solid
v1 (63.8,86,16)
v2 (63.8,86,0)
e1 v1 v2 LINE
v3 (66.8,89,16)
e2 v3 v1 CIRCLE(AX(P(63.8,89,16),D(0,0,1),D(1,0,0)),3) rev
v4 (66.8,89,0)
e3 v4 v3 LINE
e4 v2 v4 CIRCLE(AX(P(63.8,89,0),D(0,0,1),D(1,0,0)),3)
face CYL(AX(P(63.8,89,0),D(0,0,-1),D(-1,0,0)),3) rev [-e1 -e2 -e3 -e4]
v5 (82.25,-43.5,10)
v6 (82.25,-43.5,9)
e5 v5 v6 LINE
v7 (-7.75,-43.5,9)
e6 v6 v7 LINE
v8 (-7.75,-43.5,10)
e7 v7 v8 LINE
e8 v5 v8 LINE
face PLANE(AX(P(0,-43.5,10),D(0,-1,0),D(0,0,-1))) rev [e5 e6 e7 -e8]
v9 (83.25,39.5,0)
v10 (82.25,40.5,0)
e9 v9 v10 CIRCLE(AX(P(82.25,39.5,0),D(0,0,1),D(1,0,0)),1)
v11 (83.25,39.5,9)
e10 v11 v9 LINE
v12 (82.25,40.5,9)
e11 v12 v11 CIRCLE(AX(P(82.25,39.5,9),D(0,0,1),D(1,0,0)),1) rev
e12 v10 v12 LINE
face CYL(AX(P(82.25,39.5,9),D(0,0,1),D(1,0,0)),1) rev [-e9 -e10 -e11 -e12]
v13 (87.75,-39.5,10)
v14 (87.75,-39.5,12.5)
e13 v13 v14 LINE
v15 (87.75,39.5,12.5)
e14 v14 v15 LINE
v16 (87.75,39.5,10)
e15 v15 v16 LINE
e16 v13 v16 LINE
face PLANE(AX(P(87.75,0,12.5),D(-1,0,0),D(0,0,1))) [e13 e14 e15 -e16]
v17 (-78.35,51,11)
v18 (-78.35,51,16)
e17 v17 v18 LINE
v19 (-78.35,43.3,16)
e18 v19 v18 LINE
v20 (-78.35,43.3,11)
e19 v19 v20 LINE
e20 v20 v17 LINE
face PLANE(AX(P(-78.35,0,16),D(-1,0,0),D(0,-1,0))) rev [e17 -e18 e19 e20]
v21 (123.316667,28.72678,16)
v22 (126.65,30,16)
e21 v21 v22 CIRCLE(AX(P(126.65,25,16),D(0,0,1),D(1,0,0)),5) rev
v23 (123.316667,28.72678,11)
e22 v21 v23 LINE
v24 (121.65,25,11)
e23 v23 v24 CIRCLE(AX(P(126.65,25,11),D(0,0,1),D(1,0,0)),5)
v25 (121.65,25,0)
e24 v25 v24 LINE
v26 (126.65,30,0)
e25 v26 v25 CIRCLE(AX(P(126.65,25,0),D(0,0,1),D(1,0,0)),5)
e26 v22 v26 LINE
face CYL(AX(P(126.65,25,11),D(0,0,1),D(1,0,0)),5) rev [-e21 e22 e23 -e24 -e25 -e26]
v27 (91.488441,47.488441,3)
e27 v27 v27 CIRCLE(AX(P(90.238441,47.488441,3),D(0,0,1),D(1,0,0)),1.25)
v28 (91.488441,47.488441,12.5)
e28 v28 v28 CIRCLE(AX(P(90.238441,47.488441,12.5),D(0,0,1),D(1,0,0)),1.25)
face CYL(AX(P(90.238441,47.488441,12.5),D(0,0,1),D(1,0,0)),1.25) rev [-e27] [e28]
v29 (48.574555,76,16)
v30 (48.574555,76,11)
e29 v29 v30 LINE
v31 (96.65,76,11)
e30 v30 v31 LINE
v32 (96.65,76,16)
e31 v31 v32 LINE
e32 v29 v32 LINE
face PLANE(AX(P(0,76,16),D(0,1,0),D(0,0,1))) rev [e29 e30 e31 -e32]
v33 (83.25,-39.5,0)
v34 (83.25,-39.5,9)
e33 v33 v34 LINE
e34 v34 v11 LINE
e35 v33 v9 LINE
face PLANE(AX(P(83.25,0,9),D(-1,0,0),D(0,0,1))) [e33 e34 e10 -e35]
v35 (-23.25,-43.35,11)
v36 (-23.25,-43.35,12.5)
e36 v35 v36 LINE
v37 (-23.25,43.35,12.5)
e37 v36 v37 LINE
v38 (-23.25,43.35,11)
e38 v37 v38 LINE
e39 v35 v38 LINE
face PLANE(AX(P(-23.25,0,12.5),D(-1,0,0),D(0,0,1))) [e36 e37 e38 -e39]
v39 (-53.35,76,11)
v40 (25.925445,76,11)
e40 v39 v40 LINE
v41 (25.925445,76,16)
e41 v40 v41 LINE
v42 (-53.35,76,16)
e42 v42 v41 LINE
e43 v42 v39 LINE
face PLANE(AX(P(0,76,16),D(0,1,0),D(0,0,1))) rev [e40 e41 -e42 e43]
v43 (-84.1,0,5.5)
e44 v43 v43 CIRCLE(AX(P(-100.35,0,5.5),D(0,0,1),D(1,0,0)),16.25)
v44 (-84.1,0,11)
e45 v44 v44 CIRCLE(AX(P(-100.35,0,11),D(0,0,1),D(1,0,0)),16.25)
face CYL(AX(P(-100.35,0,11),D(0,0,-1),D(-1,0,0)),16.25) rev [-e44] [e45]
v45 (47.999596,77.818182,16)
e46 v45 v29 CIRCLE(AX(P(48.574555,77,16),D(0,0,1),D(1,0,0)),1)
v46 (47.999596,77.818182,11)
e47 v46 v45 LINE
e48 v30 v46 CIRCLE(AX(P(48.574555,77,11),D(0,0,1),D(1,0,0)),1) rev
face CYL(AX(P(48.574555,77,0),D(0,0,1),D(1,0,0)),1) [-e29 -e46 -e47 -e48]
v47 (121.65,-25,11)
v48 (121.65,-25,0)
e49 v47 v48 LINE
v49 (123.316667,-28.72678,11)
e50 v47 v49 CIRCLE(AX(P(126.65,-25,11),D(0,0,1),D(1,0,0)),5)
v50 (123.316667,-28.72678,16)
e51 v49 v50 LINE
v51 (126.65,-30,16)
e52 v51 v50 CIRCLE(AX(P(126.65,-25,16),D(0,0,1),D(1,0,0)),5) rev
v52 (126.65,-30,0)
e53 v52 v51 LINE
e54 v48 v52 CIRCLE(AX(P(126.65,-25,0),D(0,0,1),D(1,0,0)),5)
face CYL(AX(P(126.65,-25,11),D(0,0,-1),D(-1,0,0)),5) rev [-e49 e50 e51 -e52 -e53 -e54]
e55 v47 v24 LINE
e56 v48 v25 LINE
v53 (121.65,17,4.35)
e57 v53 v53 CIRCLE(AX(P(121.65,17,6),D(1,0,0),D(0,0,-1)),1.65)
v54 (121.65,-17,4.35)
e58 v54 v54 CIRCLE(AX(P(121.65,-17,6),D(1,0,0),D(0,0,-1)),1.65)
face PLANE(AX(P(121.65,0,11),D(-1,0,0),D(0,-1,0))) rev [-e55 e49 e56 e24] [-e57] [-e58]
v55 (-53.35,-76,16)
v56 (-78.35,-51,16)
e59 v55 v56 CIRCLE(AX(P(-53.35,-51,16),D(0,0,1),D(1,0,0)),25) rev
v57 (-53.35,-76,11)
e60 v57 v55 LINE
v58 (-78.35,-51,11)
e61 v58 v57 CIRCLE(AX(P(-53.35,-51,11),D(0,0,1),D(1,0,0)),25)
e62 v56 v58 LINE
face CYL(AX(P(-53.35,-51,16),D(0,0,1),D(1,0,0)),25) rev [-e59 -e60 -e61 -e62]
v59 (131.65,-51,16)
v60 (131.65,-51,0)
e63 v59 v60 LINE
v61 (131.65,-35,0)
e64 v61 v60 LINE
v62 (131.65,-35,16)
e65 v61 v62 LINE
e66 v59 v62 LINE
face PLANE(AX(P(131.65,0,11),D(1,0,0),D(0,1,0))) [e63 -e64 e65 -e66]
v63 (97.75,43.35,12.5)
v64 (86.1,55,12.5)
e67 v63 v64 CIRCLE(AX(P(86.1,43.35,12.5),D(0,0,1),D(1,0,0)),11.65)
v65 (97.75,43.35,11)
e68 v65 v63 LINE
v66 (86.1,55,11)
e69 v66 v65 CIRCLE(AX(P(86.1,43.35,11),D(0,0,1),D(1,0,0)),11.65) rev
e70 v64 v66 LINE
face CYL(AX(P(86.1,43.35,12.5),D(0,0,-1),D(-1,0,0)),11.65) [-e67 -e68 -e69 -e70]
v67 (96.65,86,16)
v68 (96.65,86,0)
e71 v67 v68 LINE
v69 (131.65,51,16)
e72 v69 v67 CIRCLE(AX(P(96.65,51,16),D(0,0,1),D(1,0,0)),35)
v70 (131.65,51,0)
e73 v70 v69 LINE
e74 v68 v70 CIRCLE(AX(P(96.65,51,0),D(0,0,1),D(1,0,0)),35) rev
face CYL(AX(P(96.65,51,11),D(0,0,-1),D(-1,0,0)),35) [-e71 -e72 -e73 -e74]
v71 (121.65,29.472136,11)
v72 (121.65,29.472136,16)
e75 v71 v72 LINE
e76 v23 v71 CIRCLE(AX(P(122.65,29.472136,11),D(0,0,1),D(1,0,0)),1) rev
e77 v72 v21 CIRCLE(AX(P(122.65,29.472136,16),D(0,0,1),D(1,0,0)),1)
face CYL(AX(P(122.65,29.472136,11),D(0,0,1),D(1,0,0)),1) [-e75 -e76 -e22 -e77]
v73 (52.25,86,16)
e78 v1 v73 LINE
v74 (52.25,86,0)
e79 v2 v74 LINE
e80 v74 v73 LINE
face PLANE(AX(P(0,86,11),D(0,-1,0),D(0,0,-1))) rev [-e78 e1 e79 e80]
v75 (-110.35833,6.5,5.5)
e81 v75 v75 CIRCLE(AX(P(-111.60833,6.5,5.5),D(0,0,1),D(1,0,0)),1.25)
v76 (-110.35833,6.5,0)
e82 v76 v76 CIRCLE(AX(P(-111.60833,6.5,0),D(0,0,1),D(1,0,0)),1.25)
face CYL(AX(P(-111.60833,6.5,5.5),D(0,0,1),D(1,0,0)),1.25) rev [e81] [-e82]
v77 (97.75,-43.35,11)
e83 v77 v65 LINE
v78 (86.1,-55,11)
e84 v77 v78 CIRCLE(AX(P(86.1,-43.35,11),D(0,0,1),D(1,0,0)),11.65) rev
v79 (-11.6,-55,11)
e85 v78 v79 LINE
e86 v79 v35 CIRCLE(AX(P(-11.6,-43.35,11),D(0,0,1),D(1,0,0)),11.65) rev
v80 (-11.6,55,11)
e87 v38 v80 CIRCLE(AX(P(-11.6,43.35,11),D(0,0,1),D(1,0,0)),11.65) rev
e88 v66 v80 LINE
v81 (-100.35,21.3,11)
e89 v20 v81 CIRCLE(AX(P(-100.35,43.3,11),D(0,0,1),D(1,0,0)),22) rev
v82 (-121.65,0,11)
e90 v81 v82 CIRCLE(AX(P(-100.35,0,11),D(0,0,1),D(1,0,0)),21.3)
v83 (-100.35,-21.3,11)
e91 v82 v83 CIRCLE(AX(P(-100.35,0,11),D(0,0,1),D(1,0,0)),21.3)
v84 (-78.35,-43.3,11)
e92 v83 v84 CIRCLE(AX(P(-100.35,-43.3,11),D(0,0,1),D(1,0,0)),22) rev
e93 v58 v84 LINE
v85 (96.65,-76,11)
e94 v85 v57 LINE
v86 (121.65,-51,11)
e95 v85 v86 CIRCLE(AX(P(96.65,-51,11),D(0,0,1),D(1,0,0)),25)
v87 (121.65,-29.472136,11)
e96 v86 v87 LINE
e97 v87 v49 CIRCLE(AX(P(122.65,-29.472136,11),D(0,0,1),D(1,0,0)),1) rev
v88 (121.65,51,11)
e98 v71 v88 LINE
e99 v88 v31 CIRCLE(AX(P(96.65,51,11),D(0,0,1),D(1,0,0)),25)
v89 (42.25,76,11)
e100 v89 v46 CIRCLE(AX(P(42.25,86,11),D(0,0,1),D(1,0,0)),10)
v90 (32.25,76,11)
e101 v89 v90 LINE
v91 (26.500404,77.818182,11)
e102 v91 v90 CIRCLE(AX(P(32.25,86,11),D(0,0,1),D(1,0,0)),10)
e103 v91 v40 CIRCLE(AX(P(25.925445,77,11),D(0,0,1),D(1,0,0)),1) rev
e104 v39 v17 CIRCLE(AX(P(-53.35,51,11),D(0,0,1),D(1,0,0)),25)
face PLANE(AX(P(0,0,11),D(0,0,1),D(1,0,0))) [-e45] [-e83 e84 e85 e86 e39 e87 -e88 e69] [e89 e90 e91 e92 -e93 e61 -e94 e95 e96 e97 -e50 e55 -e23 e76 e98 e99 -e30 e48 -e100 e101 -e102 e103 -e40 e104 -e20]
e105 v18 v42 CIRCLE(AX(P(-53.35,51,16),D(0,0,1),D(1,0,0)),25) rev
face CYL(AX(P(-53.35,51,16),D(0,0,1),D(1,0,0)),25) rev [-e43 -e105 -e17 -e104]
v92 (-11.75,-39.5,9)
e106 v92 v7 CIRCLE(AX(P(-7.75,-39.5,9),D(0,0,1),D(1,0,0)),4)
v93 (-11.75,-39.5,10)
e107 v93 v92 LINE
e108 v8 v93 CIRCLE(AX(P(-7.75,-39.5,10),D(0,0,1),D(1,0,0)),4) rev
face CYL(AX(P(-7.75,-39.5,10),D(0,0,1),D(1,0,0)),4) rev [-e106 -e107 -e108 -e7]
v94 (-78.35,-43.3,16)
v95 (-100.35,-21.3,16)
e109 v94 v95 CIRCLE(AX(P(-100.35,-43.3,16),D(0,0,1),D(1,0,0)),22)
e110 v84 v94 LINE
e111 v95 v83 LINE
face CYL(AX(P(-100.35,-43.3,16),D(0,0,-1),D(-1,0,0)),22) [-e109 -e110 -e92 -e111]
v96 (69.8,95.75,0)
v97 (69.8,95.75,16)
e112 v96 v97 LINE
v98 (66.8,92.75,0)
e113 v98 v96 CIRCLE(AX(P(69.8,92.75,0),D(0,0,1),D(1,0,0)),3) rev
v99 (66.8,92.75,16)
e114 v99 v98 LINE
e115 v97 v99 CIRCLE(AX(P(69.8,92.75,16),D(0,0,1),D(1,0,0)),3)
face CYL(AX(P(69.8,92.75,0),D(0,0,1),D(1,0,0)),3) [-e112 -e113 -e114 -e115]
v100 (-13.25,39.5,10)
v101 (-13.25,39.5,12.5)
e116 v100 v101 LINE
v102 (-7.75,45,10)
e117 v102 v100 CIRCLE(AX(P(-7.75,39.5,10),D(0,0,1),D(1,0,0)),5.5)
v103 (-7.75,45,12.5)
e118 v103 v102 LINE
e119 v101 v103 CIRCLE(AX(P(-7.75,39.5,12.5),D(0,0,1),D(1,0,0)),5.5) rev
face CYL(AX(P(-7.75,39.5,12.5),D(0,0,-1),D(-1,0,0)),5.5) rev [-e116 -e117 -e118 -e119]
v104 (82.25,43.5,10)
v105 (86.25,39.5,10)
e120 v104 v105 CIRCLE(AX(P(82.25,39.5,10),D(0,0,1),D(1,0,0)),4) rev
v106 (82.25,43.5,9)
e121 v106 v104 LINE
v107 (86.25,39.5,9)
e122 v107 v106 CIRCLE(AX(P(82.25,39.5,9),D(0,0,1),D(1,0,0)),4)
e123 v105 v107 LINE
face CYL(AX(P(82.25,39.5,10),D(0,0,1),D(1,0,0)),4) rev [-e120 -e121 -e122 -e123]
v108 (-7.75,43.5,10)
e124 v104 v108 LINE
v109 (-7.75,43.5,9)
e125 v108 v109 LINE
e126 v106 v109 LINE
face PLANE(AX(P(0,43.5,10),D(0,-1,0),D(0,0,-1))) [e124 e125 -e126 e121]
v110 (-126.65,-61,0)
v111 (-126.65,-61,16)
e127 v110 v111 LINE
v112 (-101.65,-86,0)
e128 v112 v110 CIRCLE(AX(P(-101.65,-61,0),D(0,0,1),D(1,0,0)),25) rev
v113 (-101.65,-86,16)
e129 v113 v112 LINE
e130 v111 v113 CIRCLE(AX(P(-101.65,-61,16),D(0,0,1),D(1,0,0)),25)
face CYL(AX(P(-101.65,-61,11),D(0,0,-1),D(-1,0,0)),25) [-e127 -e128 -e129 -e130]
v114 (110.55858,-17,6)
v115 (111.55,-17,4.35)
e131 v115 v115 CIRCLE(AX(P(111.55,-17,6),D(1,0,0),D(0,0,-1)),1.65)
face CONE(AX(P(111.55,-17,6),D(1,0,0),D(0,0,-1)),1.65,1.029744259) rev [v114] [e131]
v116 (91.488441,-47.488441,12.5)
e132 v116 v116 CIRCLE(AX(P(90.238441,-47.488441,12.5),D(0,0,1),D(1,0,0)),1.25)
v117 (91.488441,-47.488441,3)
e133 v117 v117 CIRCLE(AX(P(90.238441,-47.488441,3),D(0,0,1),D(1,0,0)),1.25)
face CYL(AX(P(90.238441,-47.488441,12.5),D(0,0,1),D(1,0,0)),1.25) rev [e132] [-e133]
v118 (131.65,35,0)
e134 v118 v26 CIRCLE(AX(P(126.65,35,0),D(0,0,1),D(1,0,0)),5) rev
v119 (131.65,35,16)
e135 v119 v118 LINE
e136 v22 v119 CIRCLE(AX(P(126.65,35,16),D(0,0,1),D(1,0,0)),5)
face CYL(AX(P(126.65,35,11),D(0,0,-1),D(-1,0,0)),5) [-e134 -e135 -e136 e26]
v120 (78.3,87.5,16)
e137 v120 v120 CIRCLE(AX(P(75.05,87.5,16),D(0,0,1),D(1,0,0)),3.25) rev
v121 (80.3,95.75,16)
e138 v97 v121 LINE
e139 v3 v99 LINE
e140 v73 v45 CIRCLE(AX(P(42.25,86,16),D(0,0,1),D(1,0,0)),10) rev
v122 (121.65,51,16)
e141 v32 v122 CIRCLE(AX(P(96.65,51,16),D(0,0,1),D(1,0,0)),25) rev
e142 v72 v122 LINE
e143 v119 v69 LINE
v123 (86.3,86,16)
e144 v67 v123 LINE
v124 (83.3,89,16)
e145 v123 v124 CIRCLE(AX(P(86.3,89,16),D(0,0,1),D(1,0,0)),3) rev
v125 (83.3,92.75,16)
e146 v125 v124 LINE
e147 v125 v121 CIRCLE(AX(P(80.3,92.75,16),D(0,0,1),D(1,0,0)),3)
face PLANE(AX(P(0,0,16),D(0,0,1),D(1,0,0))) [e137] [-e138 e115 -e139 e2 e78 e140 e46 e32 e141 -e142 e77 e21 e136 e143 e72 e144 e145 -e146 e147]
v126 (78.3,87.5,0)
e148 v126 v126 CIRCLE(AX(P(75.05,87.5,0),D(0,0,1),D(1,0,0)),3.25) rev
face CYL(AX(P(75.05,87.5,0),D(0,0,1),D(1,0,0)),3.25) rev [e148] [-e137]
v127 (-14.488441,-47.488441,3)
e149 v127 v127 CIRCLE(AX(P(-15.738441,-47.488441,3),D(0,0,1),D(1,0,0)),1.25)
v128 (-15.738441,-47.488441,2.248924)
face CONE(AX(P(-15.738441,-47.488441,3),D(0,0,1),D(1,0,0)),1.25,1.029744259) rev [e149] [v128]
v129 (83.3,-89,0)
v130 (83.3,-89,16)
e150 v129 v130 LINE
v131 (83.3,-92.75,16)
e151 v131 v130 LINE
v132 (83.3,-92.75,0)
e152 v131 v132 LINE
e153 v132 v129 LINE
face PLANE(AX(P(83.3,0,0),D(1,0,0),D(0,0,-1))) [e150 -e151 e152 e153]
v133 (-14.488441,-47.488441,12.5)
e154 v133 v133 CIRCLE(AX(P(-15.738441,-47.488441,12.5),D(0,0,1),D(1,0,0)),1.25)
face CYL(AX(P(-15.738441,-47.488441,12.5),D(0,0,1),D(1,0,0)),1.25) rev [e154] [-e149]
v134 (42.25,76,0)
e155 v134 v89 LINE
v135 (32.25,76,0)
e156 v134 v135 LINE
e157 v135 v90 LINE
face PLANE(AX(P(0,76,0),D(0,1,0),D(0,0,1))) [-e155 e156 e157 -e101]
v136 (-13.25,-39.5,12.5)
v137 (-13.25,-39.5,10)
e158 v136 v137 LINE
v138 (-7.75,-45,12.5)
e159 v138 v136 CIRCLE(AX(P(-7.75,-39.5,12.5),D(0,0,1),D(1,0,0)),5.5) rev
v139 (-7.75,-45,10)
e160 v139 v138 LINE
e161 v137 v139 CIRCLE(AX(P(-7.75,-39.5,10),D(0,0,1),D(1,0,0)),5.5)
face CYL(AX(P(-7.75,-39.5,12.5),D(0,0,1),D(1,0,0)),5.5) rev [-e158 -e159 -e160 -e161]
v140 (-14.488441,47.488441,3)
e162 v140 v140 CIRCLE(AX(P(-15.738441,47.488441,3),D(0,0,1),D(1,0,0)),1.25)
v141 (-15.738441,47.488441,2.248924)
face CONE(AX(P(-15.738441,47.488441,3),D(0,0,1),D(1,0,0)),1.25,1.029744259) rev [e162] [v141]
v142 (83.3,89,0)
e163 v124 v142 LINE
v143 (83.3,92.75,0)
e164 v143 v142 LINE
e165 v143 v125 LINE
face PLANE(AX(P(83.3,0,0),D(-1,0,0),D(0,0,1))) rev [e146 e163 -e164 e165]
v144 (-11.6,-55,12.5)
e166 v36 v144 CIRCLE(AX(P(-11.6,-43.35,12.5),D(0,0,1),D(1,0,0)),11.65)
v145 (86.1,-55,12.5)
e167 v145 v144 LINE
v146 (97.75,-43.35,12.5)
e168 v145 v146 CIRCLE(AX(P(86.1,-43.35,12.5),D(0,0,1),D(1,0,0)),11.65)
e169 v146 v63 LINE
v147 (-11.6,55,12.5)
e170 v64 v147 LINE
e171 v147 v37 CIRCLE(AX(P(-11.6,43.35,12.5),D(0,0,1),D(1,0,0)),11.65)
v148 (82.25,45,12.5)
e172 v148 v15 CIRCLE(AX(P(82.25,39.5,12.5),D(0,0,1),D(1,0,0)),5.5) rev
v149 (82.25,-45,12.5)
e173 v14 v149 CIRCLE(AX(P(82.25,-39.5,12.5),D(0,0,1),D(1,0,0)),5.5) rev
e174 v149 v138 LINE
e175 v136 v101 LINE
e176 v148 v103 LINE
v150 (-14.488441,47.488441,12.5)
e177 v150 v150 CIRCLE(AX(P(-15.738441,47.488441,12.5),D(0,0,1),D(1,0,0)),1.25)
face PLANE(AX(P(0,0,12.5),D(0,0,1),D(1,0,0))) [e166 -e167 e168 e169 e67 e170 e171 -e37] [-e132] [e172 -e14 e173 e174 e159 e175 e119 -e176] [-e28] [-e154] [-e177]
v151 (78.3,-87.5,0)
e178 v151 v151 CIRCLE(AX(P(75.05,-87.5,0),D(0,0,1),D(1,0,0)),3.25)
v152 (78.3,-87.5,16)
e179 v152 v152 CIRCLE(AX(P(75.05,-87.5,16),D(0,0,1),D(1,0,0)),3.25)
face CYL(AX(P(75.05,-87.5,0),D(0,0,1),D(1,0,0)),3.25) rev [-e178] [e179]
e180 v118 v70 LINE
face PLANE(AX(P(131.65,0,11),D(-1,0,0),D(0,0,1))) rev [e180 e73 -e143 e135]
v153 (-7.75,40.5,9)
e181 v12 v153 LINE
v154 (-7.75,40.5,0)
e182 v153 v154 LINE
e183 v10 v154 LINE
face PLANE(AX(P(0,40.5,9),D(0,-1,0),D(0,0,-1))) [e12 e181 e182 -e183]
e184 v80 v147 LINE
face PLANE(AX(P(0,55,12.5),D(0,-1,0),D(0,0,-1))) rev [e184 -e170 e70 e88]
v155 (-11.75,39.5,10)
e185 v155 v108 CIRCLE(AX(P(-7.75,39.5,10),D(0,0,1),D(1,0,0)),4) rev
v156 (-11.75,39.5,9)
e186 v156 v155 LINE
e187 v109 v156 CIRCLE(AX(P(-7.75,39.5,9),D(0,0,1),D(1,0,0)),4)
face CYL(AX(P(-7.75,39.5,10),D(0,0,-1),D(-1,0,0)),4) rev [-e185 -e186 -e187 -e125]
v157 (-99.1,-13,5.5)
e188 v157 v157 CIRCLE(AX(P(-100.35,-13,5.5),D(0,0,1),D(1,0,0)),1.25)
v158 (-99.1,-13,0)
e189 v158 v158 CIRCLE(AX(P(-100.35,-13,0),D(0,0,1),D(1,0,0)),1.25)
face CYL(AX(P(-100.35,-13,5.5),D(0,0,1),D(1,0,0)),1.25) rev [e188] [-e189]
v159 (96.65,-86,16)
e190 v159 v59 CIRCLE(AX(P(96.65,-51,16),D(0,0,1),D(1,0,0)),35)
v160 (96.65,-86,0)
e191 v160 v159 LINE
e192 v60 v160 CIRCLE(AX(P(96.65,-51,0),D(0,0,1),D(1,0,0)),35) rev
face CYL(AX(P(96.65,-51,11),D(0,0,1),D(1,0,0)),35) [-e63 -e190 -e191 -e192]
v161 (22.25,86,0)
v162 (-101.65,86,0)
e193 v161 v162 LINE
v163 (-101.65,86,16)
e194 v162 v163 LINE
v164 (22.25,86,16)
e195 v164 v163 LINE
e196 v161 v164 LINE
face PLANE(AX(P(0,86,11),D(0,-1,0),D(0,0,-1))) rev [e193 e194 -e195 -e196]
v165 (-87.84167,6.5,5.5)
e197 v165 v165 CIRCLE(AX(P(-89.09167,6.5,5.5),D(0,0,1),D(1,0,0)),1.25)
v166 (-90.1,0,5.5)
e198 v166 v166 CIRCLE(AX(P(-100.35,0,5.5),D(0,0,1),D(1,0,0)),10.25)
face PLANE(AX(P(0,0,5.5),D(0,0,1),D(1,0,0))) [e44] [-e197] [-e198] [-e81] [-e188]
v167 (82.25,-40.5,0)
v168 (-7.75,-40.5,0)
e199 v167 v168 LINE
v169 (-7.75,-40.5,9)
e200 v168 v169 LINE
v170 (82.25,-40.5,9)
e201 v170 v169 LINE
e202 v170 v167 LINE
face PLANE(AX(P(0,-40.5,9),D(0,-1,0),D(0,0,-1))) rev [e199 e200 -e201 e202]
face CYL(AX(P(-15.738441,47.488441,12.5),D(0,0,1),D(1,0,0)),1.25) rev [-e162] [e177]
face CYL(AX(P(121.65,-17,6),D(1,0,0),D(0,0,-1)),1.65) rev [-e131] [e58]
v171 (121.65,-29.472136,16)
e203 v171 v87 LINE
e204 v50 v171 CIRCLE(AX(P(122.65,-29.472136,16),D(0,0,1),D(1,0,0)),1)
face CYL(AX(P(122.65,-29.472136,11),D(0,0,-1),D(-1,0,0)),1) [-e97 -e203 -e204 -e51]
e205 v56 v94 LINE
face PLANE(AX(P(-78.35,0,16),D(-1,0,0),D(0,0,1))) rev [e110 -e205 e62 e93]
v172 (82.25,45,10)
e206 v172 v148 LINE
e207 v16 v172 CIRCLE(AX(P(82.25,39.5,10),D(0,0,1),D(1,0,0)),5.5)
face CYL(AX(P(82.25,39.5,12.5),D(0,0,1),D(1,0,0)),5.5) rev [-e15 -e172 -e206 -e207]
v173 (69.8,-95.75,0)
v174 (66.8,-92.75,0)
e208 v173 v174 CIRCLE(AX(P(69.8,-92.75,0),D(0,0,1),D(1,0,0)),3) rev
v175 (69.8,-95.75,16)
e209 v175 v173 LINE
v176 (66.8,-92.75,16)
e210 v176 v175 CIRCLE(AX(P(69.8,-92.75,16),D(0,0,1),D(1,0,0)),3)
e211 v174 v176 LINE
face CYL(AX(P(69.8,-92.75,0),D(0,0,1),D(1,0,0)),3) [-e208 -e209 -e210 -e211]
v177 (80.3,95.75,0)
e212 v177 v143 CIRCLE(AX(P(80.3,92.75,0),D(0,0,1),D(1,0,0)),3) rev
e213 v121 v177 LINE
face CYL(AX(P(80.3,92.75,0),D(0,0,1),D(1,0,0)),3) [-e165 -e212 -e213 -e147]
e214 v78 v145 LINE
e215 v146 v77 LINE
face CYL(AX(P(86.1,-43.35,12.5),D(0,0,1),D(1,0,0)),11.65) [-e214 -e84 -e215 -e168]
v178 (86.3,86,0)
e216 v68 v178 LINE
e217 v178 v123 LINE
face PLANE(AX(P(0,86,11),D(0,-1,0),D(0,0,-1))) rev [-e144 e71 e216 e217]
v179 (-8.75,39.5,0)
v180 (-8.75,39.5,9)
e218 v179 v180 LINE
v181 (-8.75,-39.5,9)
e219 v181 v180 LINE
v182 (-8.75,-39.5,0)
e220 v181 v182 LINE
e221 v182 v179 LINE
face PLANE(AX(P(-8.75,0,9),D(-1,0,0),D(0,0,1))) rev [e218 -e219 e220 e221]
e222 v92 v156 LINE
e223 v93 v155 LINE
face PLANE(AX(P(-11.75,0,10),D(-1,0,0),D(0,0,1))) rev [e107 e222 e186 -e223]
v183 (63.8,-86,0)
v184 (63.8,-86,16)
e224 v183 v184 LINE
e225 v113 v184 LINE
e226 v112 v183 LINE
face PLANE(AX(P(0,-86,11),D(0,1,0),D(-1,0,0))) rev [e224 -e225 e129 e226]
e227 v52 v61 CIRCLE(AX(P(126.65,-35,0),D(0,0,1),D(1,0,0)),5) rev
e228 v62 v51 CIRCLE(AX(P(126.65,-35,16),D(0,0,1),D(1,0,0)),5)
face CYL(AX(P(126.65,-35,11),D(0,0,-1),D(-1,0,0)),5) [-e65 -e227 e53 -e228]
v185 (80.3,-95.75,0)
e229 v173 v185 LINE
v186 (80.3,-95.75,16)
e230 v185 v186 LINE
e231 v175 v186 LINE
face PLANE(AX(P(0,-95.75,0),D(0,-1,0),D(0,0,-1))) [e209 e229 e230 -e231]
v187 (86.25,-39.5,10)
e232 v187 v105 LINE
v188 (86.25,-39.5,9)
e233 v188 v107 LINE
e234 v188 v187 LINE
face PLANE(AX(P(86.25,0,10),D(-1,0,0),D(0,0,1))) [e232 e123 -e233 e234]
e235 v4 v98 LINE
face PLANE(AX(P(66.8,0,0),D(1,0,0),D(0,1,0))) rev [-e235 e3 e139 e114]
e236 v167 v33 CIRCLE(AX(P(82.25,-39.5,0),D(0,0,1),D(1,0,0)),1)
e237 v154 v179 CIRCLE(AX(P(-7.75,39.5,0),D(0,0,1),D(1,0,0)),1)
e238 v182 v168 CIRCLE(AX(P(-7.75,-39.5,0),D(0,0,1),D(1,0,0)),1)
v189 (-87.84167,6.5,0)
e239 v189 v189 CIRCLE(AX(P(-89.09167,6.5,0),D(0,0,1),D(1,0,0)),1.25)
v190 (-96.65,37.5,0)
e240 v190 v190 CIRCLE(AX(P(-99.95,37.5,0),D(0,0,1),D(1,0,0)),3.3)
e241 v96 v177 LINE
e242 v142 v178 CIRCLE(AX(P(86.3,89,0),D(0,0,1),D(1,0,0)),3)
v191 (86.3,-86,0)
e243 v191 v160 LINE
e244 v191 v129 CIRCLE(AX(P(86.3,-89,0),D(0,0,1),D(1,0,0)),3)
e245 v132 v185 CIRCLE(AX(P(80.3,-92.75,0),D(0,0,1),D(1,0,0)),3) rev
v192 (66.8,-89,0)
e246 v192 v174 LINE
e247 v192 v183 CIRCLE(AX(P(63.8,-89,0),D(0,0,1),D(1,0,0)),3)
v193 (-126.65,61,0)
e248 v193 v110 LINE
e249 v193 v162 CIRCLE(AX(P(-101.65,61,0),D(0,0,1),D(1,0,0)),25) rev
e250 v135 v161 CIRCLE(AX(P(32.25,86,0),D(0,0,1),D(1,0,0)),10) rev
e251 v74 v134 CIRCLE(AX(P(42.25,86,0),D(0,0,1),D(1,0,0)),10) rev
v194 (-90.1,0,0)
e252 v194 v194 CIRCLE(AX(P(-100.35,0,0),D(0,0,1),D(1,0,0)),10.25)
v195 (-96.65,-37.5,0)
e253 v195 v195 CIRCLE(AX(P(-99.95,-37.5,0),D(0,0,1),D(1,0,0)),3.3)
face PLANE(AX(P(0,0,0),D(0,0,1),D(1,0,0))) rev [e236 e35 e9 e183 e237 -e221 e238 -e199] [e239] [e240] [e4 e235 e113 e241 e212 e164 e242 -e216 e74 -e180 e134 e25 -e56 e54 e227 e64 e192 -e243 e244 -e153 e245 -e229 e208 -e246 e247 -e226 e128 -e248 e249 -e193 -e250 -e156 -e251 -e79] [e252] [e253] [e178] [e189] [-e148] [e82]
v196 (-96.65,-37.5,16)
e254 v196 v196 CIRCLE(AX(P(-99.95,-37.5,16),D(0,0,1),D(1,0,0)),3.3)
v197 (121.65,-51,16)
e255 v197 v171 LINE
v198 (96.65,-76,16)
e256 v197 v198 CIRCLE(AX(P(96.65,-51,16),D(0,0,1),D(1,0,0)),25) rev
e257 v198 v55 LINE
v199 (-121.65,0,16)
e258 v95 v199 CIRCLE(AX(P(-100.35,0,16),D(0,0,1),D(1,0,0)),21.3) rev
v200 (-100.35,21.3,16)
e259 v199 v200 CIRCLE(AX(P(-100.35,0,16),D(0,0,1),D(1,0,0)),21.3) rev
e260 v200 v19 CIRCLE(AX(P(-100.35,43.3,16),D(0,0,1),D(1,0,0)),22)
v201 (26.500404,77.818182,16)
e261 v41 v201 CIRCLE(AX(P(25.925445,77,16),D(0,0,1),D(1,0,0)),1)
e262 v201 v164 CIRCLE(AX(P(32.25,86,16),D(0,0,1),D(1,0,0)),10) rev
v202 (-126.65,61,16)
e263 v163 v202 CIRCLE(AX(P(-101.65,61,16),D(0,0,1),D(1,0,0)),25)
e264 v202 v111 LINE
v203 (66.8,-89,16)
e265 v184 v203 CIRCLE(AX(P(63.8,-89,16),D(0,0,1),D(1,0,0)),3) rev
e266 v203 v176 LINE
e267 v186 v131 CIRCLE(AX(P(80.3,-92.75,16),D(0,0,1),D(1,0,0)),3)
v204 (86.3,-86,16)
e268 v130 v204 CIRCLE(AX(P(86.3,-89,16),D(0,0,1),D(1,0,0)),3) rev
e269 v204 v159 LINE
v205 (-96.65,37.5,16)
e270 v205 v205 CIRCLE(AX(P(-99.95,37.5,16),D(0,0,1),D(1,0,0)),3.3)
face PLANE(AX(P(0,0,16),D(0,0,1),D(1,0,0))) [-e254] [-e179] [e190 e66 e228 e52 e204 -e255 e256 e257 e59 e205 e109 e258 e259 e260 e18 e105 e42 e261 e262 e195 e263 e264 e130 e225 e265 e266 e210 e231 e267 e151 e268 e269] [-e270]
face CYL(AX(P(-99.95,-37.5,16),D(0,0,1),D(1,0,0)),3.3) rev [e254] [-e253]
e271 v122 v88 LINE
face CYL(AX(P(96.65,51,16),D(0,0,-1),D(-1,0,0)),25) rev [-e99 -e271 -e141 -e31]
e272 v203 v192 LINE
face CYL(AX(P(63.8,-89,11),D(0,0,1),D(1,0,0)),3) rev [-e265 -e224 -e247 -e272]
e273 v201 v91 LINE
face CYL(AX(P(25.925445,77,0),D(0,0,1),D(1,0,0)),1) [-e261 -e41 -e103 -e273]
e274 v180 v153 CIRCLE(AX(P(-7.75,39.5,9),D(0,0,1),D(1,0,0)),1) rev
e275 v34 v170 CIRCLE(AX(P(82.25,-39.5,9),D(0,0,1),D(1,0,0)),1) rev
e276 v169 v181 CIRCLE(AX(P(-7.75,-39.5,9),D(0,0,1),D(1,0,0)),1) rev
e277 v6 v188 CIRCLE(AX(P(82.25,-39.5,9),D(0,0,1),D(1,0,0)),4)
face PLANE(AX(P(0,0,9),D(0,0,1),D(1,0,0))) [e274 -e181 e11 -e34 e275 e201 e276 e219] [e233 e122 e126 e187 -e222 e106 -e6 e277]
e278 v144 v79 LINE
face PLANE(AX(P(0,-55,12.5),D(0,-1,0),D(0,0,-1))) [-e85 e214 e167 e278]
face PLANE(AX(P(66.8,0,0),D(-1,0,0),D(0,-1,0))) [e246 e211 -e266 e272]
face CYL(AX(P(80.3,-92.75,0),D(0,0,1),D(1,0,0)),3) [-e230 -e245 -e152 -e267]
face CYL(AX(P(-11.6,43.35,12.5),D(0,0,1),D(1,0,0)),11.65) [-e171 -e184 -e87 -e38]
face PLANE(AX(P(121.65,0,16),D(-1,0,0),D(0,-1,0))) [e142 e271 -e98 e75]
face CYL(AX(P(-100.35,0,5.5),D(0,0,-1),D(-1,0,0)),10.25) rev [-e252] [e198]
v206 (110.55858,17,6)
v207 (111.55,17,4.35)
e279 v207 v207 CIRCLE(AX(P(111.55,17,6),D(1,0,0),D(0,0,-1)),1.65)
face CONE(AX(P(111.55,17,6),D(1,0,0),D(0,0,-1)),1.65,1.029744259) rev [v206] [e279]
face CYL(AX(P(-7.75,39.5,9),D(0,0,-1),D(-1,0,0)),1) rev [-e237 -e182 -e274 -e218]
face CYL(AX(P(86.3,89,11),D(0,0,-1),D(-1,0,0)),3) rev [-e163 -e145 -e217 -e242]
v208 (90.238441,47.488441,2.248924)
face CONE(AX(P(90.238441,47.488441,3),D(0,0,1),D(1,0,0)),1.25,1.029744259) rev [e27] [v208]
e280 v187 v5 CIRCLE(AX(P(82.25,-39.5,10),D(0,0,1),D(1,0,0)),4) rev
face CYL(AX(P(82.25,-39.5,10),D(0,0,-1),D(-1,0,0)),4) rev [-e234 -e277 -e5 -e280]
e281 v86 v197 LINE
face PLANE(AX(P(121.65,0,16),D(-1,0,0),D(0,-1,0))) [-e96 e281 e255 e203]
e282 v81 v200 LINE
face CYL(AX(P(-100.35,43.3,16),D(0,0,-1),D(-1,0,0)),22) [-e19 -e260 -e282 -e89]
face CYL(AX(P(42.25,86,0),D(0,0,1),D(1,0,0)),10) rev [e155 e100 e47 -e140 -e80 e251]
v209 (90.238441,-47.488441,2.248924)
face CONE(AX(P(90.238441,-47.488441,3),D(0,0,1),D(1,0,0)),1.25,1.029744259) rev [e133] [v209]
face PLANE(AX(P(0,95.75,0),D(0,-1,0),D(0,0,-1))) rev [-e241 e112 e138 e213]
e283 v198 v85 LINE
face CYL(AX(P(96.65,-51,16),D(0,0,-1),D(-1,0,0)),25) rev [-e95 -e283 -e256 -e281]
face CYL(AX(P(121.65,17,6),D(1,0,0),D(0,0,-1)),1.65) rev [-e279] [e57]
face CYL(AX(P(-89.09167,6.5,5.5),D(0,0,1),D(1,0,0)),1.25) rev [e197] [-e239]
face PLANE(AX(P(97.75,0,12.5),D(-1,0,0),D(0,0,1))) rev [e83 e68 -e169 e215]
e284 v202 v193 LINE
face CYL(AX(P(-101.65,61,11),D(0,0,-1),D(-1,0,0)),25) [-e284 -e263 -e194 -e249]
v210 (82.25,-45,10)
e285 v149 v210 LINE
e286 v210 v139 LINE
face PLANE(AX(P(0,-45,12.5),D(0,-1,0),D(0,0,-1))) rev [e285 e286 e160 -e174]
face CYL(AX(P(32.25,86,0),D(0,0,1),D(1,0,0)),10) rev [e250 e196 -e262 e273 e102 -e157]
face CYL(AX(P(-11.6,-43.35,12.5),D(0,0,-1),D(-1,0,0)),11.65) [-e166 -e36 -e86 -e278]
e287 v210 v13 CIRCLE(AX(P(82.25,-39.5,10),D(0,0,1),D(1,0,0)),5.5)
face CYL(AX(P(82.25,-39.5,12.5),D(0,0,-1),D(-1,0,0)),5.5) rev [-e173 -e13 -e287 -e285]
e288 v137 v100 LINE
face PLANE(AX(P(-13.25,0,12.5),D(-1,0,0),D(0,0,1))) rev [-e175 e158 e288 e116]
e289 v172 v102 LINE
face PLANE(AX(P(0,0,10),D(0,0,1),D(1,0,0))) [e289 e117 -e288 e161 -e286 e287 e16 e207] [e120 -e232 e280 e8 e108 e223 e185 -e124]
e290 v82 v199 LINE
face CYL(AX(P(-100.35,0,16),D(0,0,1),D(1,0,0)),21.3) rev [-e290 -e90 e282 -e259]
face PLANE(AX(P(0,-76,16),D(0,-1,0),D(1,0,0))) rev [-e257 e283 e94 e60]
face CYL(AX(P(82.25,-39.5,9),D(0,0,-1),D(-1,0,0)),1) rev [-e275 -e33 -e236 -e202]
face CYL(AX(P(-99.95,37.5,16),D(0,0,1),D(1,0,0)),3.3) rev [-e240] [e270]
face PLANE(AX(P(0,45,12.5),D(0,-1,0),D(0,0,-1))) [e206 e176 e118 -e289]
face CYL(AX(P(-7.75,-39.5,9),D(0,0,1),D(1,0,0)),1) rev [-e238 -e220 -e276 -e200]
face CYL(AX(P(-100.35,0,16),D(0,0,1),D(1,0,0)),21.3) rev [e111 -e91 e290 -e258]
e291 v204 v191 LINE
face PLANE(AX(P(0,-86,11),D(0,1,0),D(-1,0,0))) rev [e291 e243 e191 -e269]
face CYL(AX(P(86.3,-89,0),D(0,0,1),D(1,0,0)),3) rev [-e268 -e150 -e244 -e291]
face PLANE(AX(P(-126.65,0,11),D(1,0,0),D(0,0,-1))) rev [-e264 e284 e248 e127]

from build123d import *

# Parameters (mm, degrees)
SKETCH1_R                = 16.25
SKETCH1_W                = 121
SKETCH1_H                = 110
BOSS_EXTRUDE1_DEPTH      = 11
SKETCH1_5_W              = 121
SKETCH1_5_H              = 110
SKETCH1_5_W_2            = 101
SKETCH1_5_H_2            = 90
BOSS_EXTRUDE2_DEPTH      = 12.5
SKETCH1_7_W              = 101
SKETCH1_7_H              = 90
SKETCH1_7_W_2            = 98
SKETCH1_7_H_2            = 87
BOSS_EXTRUDE3_DEPTH      = 10
SKETCH1_8_W              = 98
SKETCH1_8_H              = 87
SKETCH1_8_W_2            = 92
SKETCH1_8_H_2            = 81
BOSS_EXTRUDE4_DEPTH      = 9
SKETCH1_9_R              = 16.25
SKETCH1_9_R_2            = 10.25
BOSS_EXTRUDE5_DEPTH      = 5.5
OLES_RUNDING_R           = 11.65
FILLET7_R                = 1
FILLET8_R                = 4
FILLET9_R                = 5.5
M3_TAPPED_HOLE1_D        = 2.5
M4_TAPPED_HOLE2_D        = 3.3
M4_TAPPED_HOLE2_DEPTH    = 10.1
M4_TAPPED_HOLE2_TIP      = 0.991420021
FILLET11_R               = 5
M3_TAPPED_HOLE3_D        = 2.5
M3_TAPPED_HOLE3_DEPTH    = 9.5
M3_TAPPED_HOLE3_TIP      = 0.751075774
BOSS_EXTRUDE6_START      = 5
BOSS_EXTRUDE6_DEPTH      = 5
FILLET12_R               = 25
FILLET13_R               = 22
FILLET14_R               = 21.3
M6_CLEARANCE_HOLE4_D     = 6.6
CUT_EXTRUDE1_DEPTH       = 158.634775668
CUT_EXTRUDE1_DEPTH_BACK  = 158.634775668
FILLET15_START           = 11
FILLET15_DEPTH           = 5
BOSS_EXTRUDE7_DEPTH      = 5
BOSS_EXTRUDE7_DEPTH_BACK = 11
CUT_EXTRUDE2_DEPTH       = 164.158772366
CUT_EXTRUDE2_DEPTH_BACK  = 164.158772366
SKETCH26_3_R             = 3.25
FILLET16_R               = 3
JENS_S_RUNDING_R         = 35


with BuildPart() as part:
    # Sketch1 → Boss-Extrude1 (new body)
    with BuildSketch(Plane.XY):
        Polygon((-121.65, -86), (121.65, -86), (131.65, -86), (131.65, -55), (131.65, -30), (121.65, -30), (121.65, 30), (131.65, 30), (131.65, 55), (131.65, 70), (131.65, 86), (121.65, 86), (-121.65, 86), (-126.65, 86), (-126.65, -86), align=None)
        with Locations((-100.35, 0)):
            Circle(SKETCH1_R, mode=Mode.SUBTRACT)
        with Locations((37.25, 0)):
            Rectangle(SKETCH1_W, SKETCH1_H, mode=Mode.SUBTRACT)
    extrude(amount=BOSS_EXTRUDE1_DEPTH)

    # Sketch1<5> → Boss-Extrude2 (add)
    with BuildSketch(Plane.XY):
        with Locations((37.25, 0)):
            Rectangle(SKETCH1_5_W, SKETCH1_5_H)
        with Locations((37.25, 0)):
            Rectangle(SKETCH1_5_W_2, SKETCH1_5_H_2, mode=Mode.SUBTRACT)
    extrude(amount=BOSS_EXTRUDE2_DEPTH)

    # Sketch1<7> → Boss-Extrude3 (add)
    with BuildSketch(Plane.XY):
        with Locations((37.25, 0)):
            Rectangle(SKETCH1_7_W, SKETCH1_7_H)
        with Locations((37.25, 0)):
            Rectangle(SKETCH1_7_W_2, SKETCH1_7_H_2, mode=Mode.SUBTRACT)
    extrude(amount=BOSS_EXTRUDE3_DEPTH)

    # Sketch1<8> → Boss-Extrude4 (add)
    with BuildSketch(Plane.XY):
        with Locations((37.25, 0)):
            Rectangle(SKETCH1_8_W, SKETCH1_8_H)
        with Locations((37.25, 0)):
            Rectangle(SKETCH1_8_W_2, SKETCH1_8_H_2, mode=Mode.SUBTRACT)
    extrude(amount=BOSS_EXTRUDE4_DEPTH)

    # Sketch1<9> → Boss-Extrude5 (add)
    with BuildSketch(Plane.XY):
        with Locations((-100.35, 0)):
            Circle(SKETCH1_9_R)
        with Locations((-100.35, 0)):
            Circle(SKETCH1_9_R_2, mode=Mode.SUBTRACT)
    extrude(amount=BOSS_EXTRUDE5_DEPTH)

    # oles runding
    oles_runding_edges = [part.edges().sort_by_distance(p)[0] for p in [
        (-23.25, 55, 11.75),
        (-23.25, -55, 11.75),
        (97.75, -55, 11.75),
        (97.75, 55, 11.75),
    ]]
    fillet(oles_runding_edges, radius=OLES_RUNDING_R)

    # Fillet7
    fillet7_edges = [part.edges().sort_by_distance(p)[0] for p in [
        (83.25, -40.5, 4.5),
        (-8.75, -40.5, 4.5),
        (-8.75, 40.5, 4.5),
        (83.25, 40.5, 4.5),
    ]]
    fillet(fillet7_edges, radius=FILLET7_R)

    # Fillet8
    fillet8_edges = [part.edges().sort_by_distance(p)[0] for p in [
        (86.25, -43.5, 9.5),
        (-11.75, -43.5, 9.5),
        (-11.75, 43.5, 9.5),
        (86.25, 43.5, 9.5),
    ]]
    fillet(fillet8_edges, radius=FILLET8_R)

    # Fillet9
    fillet9_edges = [part.edges().sort_by_distance(p)[0] for p in [
        (87.75, -45, 11.25),
        (-13.25, -45, 11.25),
        (-13.25, 45, 11.25),
        (87.75, 45, 11.25),
    ]]
    fillet(fillet9_edges, radius=FILLET9_R)

    # M3 Tapped Hole1 (through all)
    with Locations(Plane.XY.offset(5.5)):
        with Locations((-89.091669751, 6.5), (-100.35, -13), (-111.608330249, 6.5)):
            Hole(M3_TAPPED_HOLE1_D / 2)

    # M4 Tapped Hole2
    with Locations(Plane(origin=(121.65, 0, 0), x_dir=(0, 0, -1), z_dir=(1, 0, 0))):
        with Locations((-6, 17), (-6, -17)):
            Hole(M4_TAPPED_HOLE2_D / 2, depth=M4_TAPPED_HOLE2_DEPTH)
            with Locations((0, 0, -(M4_TAPPED_HOLE2_DEPTH + M4_TAPPED_HOLE2_TIP / 2))):  # 118° drill point
                Cone(0, M4_TAPPED_HOLE2_D / 2, M4_TAPPED_HOLE2_TIP, mode=Mode.SUBTRACT)

    # Fillet11
    fillet11_edges = [part.edges().sort_by_distance(p)[0] for p in [
        (121.65, -30, 5.5),
        (121.65, 30, 5.5),
    ]]
    fillet(fillet11_edges, radius=FILLET11_R)
    fillet11_2_edges = [part.edges().sort_by_distance(p)[0] for p in [
        (131.65, -30, 5.5),
        (131.65, 30, 5.5),
    ]]
    fillet(fillet11_2_edges, radius=FILLET11_R - 0.0001)  # a hair under: the kernel refuses the full size

    # M3 Tapped Hole3
    with Locations(Plane.XY.offset(12.5)):
        with Locations((-15.738440649, -47.488440649), (-15.738440649, 47.488440649), (90.238440649, 47.488440649), (90.238440649, -47.488440649)):
            Hole(M3_TAPPED_HOLE3_D / 2, depth=M3_TAPPED_HOLE3_DEPTH)
            with Locations((0, 0, -(M3_TAPPED_HOLE3_DEPTH + M3_TAPPED_HOLE3_TIP / 2))):  # 118° drill point
                Cone(0, M3_TAPPED_HOLE3_D / 2, M3_TAPPED_HOLE3_TIP, mode=Mode.SUBTRACT)

    # Sketch20 → Boss-Extrude6 (add)
    with BuildSketch(Plane.XY.offset(11).offset(BOSS_EXTRUDE6_START)):
        with BuildLine():
            Line((121.65, -25), (121.65, -76))
            Line((121.65, -76), (-78.35, -76))
            Line((-78.35, -76), (-78.35, -21.3))
            Line((-78.35, -21.3), (-121.65, -21.3))
            Line((-121.65, -21.3), (-121.65, 21.3))
            Line((-121.65, 21.3), (-78.35, 21.3))
            Line((-78.35, 21.3), (-78.35, 76))
            Line((-78.35, 76), (31.535138546, 76))
            Line((31.535138546, 76), (61.535138546, 76))
            Line((61.535138546, 76), (121.65, 76))
            Line((121.65, 76), (121.65, 25))
            ThreePointArc((121.65, 25), (123.114466094, 28.535533906), (126.65, 30))
            ThreePointArc((126.65, 30), (130.185533906, 31.464466094), (131.65, 35))
            Line((131.65, 35), (131.65, 86))
            Line((131.65, 86), (-126.65, 86))
            Line((-126.65, 86), (-126.65, -86))
            Line((-126.65, -86), (131.65, -86))
            Line((131.65, -86), (131.65, -35))
            ThreePointArc((131.65, -35), (130.185533906, -31.464466094), (126.65, -30))
            ThreePointArc((126.65, -30), (123.114466094, -28.535533906), (121.65, -25))
        make_face()
    extrude(amount=-BOSS_EXTRUDE6_DEPTH)

    # Fillet12
    fillet12_edges = [part.edges().sort_by_distance(p)[0] for p in [
        (-126.65, -86, 8),
        (-126.65, 86, 8),
        (121.65, -76, 13.5),
        (-78.35, -76, 13.5),
        (-78.35, 76, 13.5),
        (121.65, 76, 13.5),
    ]]
    fillet(fillet12_edges, radius=FILLET12_R)

    # Fillet13
    fillet13_edges = [part.edges().sort_by_distance(p)[0] for p in [
        (-78.35, -21.3, 13.5),
        (-78.35, 21.3, 13.5),
    ]]
    fillet(fillet13_edges, radius=FILLET13_R)

    # Fillet14
    fillet14_edges = [part.edges().sort_by_distance(p)[0] for p in [
        (-121.65, -21.3, 13.5),
        (-121.65, 21.3, 13.5),
    ]]
    fillet(fillet14_edges, radius=FILLET14_R - 0.0001)  # a hair under: the kernel refuses the full size

    # M6 Clearance Hole4 (through all)
    with Locations(Plane.XY.offset(16)):
        with Locations((-99.95, 37.5), (-99.95, -37.5)):
            Hole(M6_CLEARANCE_HOLE4_D / 2)

    # Sketch25 → Cut-Extrude1 (cut, two sides: drawn at the far end of the back side and taken through both)
    with BuildSketch(Plane.XY.offset(11).offset(-CUT_EXTRUDE1_DEPTH_BACK)):
        with BuildLine():
            Line((52.25, 86), (22.25, 86))
            ThreePointArc((22.25, 86), (25.178932188, 78.928932188), (32.25, 76))
            Line((32.25, 76), (42.25, 76))
            ThreePointArc((42.25, 76), (49.321067812, 78.928932188), (52.25, 86))
        make_face()
    extrude(amount=CUT_EXTRUDE1_DEPTH + CUT_EXTRUDE1_DEPTH_BACK, mode=Mode.SUBTRACT)

    # Fillet15: read off the stored shape, not the designer's step
    # Fillet15 outline → Fillet15 (cut)
    with BuildSketch(Plane.XY.offset(FILLET15_START)):
        with BuildLine():
            Line((121.65, -25), (121.65, -29.472135955))
            ThreePointArc((121.65, -29.472135955), (122.24175171, -28.559265026), (123.316666667, -28.726779962))
            ThreePointArc((123.316666667, -28.726779962), (122.085645354, -27.041241452), (121.65, -25))
        make_face()
        with BuildLine():
            ThreePointArc((123.316666667, 28.726779962), (122.24175171, 28.559265026), (121.65, 29.472135955))
            Line((121.65, 29.472135955), (121.65, 25))
            ThreePointArc((121.65, 25), (122.085645354, 27.041241452), (123.316666667, 28.726779962))
        make_face()
        with BuildLine():
            ThreePointArc((48.57455532, 76), (47.621092731, 76.698488655), (47.999595746, 77.818181818))
            ThreePointArc((47.999595746, 77.818181818), (45.265113446, 76.465374107), (42.25, 76))
            Line((42.25, 76), (48.57455532, 76))
        make_face()
        with BuildLine():
            ThreePointArc((26.500404254, 77.818181818), (26.878907269, 76.698488655), (25.92544468, 76))
            Line((25.92544468, 76), (32.25, 76))
            ThreePointArc((32.25, 76), (29.234886554, 76.465374107), (26.500404254, 77.818181818))
        make_face()
    extrude(amount=FILLET15_DEPTH, mode=Mode.SUBTRACT)

    # Sketch26 → Boss-Extrude7 (add, two sides: drawn at the far end of the back side and taken through both)
    with BuildSketch(Plane.XY.offset(11).offset(-BOSS_EXTRUDE7_DEPTH_BACK)):
        with BuildLine():
            Line((72.166859351, -86), (66.8, -86))
            Line((66.8, -86), (66.8, -95.75))
            Line((66.8, -95.75), (83.3, -95.75))
            Line((83.3, -95.75), (83.3, -86))
            Line((83.3, -86), (77.933140649, -86))
            ThreePointArc((77.933140649, -86), (78.206953207, -86.727894796), (78.3, -87.5))
            ThreePointArc((78.3, -87.5), (74.277894796, -90.656953207), (72.166859351, -86))
        make_face()
        with BuildLine():
            Line((66.8, 95.75), (66.8, 86))
            Line((66.8, 86), (72.166859351, 86))
            ThreePointArc((72.166859351, 86), (74.277894796, 90.656953207), (78.3, 87.5))
            ThreePointArc((78.3, 87.5), (78.206953207, 86.727894796), (77.933140649, 86))
            Line((77.933140649, 86), (83.3, 86))
            Line((83.3, 86), (83.3, 95.75))
            Line((83.3, 95.75), (66.8, 95.75))
        make_face()
    extrude(amount=BOSS_EXTRUDE7_DEPTH + BOSS_EXTRUDE7_DEPTH_BACK)

    # Sketch26<3> → Cut-Extrude2 (cut, two sides: drawn at the far end of the back side and taken through both)
    with BuildSketch(Plane.XY.offset(11).offset(-CUT_EXTRUDE2_DEPTH_BACK)):
        with Locations((75.05, -87.5)):
            Circle(SKETCH26_3_R)
        with Locations((75.05, 87.5)):
            Circle(SKETCH26_3_R)
    extrude(amount=CUT_EXTRUDE2_DEPTH + CUT_EXTRUDE2_DEPTH_BACK, mode=Mode.SUBTRACT)

    # Fillet16
    fillet16_edges = [part.edges().sort_by_distance(p)[0] for p in [
        (83.3, -86, 8),
        (83.3, -95.75, 8),
        (66.8, -95.75, 8),
        (66.8, -86, 8),
        (66.8, 86, 8),
        (66.8, 95.75, 8),
        (83.3, 95.75, 8),
        (83.3, 86, 8),
    ]]
    fillet(fillet16_edges, radius=FILLET16_R)

    # Jens's runding
    jens_s_runding_edges = [part.edges().sort_by_distance(p)[0] for p in [
        (131.65, -86, 8),
        (131.65, 86, 8),
    ]]
    fillet(jens_s_runding_edges, radius=JENS_S_RUNDING_R)


solid = part.part
